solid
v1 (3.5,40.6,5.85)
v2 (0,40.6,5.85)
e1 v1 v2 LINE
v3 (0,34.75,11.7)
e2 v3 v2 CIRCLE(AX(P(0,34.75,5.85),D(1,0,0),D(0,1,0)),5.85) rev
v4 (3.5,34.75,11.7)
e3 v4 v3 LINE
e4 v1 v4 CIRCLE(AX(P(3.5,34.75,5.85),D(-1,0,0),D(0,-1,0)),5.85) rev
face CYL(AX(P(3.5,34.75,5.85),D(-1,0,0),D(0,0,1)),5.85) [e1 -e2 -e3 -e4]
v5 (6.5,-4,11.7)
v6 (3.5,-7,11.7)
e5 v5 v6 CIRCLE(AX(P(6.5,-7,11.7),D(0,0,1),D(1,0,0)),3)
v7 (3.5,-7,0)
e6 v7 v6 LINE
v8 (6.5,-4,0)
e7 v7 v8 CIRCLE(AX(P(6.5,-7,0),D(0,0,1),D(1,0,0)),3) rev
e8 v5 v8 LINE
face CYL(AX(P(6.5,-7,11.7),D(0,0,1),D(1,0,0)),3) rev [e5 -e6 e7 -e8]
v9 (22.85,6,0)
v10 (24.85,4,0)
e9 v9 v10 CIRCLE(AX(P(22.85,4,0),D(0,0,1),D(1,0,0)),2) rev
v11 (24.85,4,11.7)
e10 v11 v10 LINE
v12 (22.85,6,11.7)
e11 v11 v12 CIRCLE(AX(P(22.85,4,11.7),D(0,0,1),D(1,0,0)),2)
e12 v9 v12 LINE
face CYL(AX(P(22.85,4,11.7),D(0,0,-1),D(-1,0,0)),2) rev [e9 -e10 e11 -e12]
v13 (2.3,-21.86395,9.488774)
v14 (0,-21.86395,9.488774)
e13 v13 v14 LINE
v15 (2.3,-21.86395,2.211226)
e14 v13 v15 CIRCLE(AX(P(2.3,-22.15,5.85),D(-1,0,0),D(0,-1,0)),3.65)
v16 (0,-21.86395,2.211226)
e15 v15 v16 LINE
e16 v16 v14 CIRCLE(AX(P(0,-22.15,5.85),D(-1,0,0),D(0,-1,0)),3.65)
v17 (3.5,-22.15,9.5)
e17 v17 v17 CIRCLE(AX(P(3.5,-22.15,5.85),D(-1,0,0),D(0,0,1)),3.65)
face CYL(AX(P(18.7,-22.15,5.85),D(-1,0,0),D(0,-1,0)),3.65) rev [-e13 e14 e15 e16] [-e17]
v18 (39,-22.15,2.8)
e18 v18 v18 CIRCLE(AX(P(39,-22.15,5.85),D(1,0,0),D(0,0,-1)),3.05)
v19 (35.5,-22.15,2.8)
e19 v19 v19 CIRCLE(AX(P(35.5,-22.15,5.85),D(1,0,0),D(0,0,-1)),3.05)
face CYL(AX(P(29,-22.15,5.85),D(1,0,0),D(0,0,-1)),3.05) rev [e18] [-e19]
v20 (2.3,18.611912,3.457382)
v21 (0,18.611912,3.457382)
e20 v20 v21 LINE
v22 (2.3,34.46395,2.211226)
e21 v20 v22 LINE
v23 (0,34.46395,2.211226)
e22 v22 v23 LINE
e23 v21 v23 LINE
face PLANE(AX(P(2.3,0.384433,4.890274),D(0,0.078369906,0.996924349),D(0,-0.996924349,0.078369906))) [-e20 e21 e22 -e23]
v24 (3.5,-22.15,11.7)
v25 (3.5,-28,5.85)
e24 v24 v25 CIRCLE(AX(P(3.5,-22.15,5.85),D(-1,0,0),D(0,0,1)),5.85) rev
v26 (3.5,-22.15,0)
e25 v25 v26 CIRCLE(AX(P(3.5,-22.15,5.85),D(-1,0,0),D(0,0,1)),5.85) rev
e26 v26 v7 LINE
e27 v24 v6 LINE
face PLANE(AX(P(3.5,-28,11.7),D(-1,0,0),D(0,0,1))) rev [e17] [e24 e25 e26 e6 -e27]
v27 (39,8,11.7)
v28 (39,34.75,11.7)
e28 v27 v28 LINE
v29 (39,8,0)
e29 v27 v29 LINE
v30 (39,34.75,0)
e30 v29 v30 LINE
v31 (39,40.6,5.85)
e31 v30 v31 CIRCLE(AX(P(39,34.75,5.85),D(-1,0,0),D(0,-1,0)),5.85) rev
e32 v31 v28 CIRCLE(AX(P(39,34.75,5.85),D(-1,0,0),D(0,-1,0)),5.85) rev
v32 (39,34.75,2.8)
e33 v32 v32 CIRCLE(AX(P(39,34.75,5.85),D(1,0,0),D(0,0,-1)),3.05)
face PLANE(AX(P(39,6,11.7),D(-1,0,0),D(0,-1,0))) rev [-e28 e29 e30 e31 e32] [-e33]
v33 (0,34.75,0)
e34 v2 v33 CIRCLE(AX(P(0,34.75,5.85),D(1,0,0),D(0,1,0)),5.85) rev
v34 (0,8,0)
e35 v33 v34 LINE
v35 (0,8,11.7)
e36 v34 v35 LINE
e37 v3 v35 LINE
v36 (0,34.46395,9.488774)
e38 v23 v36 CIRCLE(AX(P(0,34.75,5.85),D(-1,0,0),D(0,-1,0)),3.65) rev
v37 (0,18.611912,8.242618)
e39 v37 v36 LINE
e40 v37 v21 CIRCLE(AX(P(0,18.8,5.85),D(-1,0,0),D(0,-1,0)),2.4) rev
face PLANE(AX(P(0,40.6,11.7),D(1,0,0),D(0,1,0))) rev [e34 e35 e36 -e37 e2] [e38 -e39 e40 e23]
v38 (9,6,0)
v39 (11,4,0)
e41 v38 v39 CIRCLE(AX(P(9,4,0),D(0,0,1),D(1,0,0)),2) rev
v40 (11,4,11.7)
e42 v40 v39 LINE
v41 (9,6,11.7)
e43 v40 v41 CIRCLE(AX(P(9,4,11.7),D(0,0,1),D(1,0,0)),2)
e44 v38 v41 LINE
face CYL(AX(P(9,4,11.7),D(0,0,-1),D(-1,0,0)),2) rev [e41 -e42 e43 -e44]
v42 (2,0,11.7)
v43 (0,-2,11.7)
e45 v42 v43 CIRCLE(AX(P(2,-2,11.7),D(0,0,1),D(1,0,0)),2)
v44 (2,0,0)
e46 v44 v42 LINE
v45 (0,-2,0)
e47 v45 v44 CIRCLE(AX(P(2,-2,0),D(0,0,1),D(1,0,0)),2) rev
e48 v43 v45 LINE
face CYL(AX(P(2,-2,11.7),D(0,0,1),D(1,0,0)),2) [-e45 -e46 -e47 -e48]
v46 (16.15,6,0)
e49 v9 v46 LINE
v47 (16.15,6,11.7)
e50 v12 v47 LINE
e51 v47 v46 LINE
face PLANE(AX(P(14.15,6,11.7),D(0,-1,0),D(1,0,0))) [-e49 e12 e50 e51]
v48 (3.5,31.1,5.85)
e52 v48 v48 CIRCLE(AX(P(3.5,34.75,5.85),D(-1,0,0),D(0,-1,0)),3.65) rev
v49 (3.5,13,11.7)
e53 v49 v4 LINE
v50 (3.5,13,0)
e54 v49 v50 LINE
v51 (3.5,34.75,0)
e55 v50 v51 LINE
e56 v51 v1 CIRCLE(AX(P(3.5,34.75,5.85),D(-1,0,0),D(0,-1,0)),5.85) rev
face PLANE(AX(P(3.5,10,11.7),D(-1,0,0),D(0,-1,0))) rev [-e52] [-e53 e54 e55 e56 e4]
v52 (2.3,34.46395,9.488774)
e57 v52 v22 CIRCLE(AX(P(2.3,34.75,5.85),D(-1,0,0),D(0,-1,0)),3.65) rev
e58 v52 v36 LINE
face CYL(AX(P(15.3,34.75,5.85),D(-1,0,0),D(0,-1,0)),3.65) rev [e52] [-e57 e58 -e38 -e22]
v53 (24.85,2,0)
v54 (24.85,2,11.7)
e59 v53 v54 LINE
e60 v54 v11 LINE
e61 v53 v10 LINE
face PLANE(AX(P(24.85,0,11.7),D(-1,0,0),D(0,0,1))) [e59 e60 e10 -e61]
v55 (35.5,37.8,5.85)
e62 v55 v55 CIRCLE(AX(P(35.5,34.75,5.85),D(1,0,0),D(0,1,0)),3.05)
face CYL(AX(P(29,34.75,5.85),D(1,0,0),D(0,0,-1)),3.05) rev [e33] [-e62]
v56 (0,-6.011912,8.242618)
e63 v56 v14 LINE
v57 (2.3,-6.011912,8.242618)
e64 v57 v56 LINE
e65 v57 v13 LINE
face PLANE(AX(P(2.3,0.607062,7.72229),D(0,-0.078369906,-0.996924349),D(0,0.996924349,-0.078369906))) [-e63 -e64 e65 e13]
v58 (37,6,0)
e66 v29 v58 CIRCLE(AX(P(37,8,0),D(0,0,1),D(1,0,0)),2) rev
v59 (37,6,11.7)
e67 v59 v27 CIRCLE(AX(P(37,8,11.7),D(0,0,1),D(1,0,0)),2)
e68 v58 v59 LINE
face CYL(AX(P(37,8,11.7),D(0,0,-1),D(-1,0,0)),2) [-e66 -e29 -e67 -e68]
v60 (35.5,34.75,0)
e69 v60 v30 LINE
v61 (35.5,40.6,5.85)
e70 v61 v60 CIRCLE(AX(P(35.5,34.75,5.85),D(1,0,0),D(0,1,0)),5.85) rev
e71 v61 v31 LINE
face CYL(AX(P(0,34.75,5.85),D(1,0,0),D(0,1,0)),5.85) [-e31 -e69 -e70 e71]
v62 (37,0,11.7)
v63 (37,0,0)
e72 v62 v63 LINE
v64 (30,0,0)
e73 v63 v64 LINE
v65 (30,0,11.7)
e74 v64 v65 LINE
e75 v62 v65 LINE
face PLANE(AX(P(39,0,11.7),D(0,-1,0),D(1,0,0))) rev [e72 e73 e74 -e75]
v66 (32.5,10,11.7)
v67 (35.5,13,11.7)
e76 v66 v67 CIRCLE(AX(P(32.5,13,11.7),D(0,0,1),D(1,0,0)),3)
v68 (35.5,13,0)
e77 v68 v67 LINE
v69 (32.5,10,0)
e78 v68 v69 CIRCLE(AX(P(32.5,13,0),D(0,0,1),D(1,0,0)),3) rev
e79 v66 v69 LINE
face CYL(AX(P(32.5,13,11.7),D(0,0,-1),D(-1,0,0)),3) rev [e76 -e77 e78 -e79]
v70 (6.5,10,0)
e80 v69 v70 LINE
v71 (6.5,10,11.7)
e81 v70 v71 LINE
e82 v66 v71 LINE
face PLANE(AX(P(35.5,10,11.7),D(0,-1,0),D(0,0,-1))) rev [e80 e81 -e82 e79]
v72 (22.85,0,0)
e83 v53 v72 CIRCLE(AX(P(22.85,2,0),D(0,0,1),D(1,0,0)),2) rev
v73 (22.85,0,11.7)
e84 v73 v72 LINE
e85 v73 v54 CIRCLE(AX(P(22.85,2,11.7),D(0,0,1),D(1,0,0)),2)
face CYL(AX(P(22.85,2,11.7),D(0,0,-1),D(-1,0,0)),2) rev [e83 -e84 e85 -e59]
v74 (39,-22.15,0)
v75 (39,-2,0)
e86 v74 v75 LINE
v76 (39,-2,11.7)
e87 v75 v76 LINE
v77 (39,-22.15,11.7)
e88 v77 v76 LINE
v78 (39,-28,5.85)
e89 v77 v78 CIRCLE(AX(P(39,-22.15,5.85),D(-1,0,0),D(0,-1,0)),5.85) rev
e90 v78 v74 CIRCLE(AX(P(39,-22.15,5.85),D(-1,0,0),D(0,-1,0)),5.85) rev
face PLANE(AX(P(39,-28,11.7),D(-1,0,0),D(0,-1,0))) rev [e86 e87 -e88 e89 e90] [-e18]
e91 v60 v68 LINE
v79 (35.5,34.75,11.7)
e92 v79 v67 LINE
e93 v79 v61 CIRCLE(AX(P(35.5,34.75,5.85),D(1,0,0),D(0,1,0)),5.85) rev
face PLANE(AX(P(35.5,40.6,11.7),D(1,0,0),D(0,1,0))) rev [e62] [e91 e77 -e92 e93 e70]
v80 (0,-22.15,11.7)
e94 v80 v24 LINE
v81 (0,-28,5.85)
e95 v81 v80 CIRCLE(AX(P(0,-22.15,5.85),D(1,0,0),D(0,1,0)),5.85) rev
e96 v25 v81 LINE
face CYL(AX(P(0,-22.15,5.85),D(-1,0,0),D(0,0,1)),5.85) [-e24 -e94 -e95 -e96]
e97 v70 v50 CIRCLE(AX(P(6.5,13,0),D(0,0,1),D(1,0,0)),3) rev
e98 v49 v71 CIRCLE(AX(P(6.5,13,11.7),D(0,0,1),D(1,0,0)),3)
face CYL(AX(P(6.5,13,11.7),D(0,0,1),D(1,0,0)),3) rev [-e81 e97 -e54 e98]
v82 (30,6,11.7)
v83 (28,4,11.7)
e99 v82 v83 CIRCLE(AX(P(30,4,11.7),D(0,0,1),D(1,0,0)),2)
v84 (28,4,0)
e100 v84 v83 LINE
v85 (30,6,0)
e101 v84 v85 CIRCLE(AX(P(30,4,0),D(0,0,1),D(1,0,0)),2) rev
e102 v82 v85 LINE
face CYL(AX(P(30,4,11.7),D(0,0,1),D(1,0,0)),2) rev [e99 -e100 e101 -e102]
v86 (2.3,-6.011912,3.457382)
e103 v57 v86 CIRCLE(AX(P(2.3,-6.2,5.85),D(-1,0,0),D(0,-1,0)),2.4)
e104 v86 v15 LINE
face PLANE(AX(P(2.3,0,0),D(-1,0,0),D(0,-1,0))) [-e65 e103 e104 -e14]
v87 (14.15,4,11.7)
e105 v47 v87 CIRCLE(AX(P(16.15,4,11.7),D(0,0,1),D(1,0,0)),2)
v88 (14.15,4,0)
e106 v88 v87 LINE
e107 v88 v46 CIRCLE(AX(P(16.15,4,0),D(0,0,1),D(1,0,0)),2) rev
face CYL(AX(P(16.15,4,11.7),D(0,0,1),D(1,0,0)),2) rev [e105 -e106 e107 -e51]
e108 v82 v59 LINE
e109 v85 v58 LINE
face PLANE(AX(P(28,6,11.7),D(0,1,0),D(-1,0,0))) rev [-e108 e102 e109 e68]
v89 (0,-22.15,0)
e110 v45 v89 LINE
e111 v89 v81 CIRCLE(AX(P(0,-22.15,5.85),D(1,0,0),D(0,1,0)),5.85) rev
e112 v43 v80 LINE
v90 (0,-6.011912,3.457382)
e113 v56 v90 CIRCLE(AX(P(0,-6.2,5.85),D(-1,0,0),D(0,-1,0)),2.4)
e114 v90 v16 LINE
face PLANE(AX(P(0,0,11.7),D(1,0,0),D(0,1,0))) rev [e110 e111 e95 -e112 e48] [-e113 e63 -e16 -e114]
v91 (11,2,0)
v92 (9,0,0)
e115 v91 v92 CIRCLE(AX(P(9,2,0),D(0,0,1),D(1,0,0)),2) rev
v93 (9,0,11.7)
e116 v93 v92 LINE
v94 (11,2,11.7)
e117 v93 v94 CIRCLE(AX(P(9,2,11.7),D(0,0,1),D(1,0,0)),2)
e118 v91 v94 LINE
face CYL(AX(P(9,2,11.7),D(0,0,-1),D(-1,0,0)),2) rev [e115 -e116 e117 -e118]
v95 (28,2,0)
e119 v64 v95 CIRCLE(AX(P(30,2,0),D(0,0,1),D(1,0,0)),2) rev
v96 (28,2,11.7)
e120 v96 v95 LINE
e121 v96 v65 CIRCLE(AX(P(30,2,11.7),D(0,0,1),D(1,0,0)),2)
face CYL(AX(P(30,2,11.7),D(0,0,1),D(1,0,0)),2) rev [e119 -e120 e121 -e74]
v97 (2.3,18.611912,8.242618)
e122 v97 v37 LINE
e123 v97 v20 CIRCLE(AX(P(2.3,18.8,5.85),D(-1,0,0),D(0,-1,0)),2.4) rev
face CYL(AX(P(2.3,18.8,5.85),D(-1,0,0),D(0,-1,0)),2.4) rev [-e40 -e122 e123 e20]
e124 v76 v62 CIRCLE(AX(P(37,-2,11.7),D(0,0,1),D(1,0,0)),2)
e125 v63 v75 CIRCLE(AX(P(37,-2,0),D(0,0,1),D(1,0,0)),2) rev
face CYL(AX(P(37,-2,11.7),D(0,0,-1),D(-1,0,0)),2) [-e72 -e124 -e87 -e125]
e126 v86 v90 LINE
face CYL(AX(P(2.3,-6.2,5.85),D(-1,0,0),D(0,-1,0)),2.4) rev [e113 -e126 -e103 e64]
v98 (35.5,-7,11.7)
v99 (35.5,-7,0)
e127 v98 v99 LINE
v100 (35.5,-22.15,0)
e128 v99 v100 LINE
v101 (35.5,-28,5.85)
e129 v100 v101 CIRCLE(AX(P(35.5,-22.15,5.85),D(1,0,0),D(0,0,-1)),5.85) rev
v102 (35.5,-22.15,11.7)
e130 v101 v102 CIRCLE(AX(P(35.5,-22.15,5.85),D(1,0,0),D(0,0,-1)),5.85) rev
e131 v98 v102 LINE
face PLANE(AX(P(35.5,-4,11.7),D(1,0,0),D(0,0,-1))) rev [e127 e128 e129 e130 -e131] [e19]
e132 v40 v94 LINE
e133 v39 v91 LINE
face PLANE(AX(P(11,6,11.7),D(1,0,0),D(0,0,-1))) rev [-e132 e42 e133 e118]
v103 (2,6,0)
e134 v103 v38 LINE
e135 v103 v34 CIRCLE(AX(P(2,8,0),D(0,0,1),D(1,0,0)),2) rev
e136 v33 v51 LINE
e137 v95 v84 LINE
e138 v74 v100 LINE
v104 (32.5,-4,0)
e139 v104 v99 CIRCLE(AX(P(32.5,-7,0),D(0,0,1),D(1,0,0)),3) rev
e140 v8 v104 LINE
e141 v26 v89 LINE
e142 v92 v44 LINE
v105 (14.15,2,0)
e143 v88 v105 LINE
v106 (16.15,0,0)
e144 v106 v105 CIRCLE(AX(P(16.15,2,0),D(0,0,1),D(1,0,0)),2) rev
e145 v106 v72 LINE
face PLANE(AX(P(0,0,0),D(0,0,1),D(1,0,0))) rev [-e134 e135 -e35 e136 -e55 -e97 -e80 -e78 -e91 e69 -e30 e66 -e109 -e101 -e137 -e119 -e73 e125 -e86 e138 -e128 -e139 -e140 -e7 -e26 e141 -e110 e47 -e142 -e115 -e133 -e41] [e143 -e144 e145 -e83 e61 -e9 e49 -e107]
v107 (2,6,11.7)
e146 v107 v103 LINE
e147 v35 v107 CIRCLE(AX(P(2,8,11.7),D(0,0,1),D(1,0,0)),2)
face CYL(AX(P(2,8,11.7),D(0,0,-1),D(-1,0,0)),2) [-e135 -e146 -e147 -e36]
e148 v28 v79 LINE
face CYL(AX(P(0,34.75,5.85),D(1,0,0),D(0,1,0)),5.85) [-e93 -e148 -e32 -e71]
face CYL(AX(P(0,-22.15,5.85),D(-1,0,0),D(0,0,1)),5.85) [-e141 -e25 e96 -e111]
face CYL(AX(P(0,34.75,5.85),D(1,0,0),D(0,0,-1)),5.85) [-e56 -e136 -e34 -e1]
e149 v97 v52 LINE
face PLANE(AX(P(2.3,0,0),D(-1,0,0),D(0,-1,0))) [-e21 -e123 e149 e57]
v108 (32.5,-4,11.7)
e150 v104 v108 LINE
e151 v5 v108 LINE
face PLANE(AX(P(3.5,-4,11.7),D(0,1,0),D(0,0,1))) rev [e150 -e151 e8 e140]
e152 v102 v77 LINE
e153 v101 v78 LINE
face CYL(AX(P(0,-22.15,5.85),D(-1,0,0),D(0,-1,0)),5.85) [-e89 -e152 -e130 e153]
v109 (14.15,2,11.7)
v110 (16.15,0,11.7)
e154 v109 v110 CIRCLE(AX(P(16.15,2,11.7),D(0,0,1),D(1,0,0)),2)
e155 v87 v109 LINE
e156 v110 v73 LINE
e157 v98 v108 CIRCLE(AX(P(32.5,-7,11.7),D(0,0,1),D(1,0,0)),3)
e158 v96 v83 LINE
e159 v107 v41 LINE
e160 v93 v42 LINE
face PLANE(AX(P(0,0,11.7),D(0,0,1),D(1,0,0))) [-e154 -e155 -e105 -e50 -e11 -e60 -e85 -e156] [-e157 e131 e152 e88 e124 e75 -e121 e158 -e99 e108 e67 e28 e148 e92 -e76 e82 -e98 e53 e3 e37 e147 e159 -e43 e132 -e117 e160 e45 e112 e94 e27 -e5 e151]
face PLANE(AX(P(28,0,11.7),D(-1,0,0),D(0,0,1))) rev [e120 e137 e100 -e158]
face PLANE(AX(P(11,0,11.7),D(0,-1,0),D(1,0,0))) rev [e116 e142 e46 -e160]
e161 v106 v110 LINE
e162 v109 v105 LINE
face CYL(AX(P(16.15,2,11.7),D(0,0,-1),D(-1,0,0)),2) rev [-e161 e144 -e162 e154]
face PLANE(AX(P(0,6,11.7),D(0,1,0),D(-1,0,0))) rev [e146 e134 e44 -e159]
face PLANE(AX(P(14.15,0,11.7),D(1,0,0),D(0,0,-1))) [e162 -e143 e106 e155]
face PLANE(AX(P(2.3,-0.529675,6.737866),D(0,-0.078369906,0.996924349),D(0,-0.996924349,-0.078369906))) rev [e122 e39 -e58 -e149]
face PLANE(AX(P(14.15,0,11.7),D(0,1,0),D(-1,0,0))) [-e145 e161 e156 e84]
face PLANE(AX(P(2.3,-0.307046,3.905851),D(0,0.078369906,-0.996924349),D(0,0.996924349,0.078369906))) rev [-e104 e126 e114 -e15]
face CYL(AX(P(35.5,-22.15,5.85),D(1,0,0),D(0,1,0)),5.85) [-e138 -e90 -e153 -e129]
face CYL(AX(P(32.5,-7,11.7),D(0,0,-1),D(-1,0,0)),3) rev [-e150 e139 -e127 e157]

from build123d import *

# Parameters (mm, degrees)
SKETCH_1_W          = 10.7
SKETCH_1_H          = 6
EXTRUDE_1_DEPTH     = 11.7
SKETCH_2_R          = 3.65
CUT_EXTRUDE_1_DEPTH = 18.7
CUT_EXTRUDE_2_DEPTH = 2.3
SKETCH_2_4_R        = 3.65
CUT_EXTRUDE_3_DEPTH = 15.3
CUT_EXTRUDE_4_DEPTH = 2.3
FILLET_1_R          = 2
FILLET_2_R          = 2
FILLET_3_R          = 2
FILLET_4_R          = 2
FILLET_5_R          = 5.85
FILLET_6_R          = 5.85
FILLET_7_R          = 5.85
FILLET_8_R          = 5.85
FILLET_9_R          = 5.85
FILLET_10_R         = 5.85
FILLET_11_R         = 5.85
FILLET_12_R         = 5.85
FILLET_13_R         = 2
FILLET_14_R         = 2
FILLET_15_R         = 2
FILLET_16_R         = 2
FILLET_17_R         = 2
FILLET_18_R         = 2
FILLET_19_R         = 2
FILLET_20_R         = 2
SKETCH_3_R          = 3.05
CUT_EXTRUDE_5_DEPTH = 10
FILLET_21_R         = 3
FILLET_22_R         = 3
FILLET_23_R         = 3
FILLET_24_R         = 3


with BuildPart() as part:
    # 草图1 → 凸台-拉伸1 (new body)
    with BuildSketch(Plane.XY):
        Polygon((0, 0), (0, -28), (3.5, -28), (3.5, -4), (35.5, -4), (35.5, -28), (39, -28), (39, 0), (28, 0), (28, 6), (39, 6), (39, 40.6), (35.5, 40.6), (35.5, 10), (3.5, 10), (3.5, 40.6), (0, 40.6), (0, 6), (11, 6), (11, 0), align=None)
        with Locations((19.5, 3)):
            Rectangle(SKETCH_1_W, SKETCH_1_H, mode=Mode.SUBTRACT)
    extrude(amount=EXTRUDE_1_DEPTH)

    # 草图2 → 切除-拉伸1 (cut)
    with BuildSketch(Plane.ZY):
        with Locations(Location((5.85, -22.15, 0), (0, 0, 270))):
            Circle(SKETCH_2_R)
    extrude(amount=-CUT_EXTRUDE_1_DEPTH, mode=Mode.SUBTRACT)

    # 草图2<3> → 切除-拉伸2 (cut)
    with BuildSketch(Plane.ZY):
        with BuildLine():
            ThreePointArc((8.242618438, -6.011912226), (5.85, -3.8), (3.457381562, -6.011912226))
            Line((3.457381562, -6.011912226), (2.211226126, -21.863949843))
            ThreePointArc((2.211226126, -21.863949843), (5.85, -18.5), (9.488773874, -21.863949843))
            Line((9.488773874, -21.863949843), (8.242618438, -6.011912226))
        make_face()
    extrude(amount=-CUT_EXTRUDE_2_DEPTH, mode=Mode.SUBTRACT)

    # 草图2<4> → 切除-拉伸3 (cut)
    with BuildSketch(Plane.ZY):
        with Locations(Location((5.85, 34.75, 0), (0, 0, 270))):
            Circle(SKETCH_2_4_R)
    extrude(amount=-CUT_EXTRUDE_3_DEPTH, mode=Mode.SUBTRACT)

    # 草图2<5> → 切除-拉伸4 (cut)
    with BuildSketch(Plane.ZY):
        with BuildLine():
            Line((2.211226126, 34.463949843), (3.457381562, 18.611912226))
            ThreePointArc((3.457381562, 18.611912226), (5.85, 16.4), (8.242618438, 18.611912226))
            Line((8.242618438, 18.611912226), (9.488773874, 34.463949843))
            ThreePointArc((9.488773874, 34.463949843), (5.85, 31.1), (2.211226126, 34.463949843))
        make_face()
    extrude(amount=-CUT_EXTRUDE_4_DEPTH, mode=Mode.SUBTRACT)

    # 圆角1
    fillet_1_edges = [part.edges().sort_by_distance(p)[0] for p in [
        (0, 6, 5.85),
    ]]
    fillet(fillet_1_edges, radius=FILLET_1_R)

    # 圆角2
    fillet_2_edges = [part.edges().sort_by_distance(p)[0] for p in [
        (39, 6, 5.85),
    ]]
    fillet(fillet_2_edges, radius=FILLET_2_R)

    # 圆角3
    fillet_3_edges = [part.edges().sort_by_distance(p)[0] for p in [
        (39, 0, 5.85),
    ]]
    fillet(fillet_3_edges, radius=FILLET_3_R)

    # 圆角4
    fillet_4_edges = [part.edges().sort_by_distance(p)[0] for p in [
        (0, 0, 5.85),
    ]]
    fillet(fillet_4_edges, radius=FILLET_4_R)

    # 圆角5
    fillet_5_edges = [part.edges().sort_by_distance(p)[0] for p in [
        (1.75, -28, 11.7),
    ]]
    fillet(fillet_5_edges, radius=FILLET_5_R)

    # 圆角6
    fillet_6_edges = [part.edges().sort_by_distance(p)[0] for p in [
        (1.75, -28, 0),
    ]]
    fillet(fillet_6_edges, radius=FILLET_6_R - 0.0001)  # a hair under: the kernel refuses the full size

    # 圆角7
    fillet_7_edges = [part.edges().sort_by_distance(p)[0] for p in [
        (37.25, -28, 0),
    ]]
    fillet(fillet_7_edges, radius=FILLET_7_R)

    # 圆角8
    fillet_8_edges = [part.edges().sort_by_distance(p)[0] for p in [
        (37.25, -28, 11.7),
    ]]
    fillet(fillet_8_edges, radius=FILLET_8_R - 0.0001)  # a hair under: the kernel refuses the full size

    # 圆角9
    fillet_9_edges = [part.edges().sort_by_distance(p)[0] for p in [
        (37.25, 40.6, 11.7),
    ]]
    fillet(fillet_9_edges, radius=FILLET_9_R)

    # 圆角10
    fillet_10_edges = [part.edges().sort_by_distance(p)[0] for p in [
        (37.25, 40.6, 0),
    ]]
    fillet(fillet_10_edges, radius=FILLET_10_R - 0.0001)  # a hair under: the kernel refuses the full size

    # 圆角11
    fillet_11_edges = [part.edges().sort_by_distance(p)[0] for p in [
        (1.75, 40.6, 0),
    ]]
    fillet(fillet_11_edges, radius=FILLET_11_R)

    # 圆角12
    fillet_12_edges = [part.edges().sort_by_distance(p)[0] for p in [
        (1.75, 40.6, 11.7),
    ]]
    fillet(fillet_12_edges, radius=FILLET_12_R - 0.0001)  # a hair under: the kernel refuses the full size

    # 圆角13
    fillet_13_edges = [part.edges().sort_by_distance(p)[0] for p in [
        (28, 6, 5.85),
    ]]
    fillet(fillet_13_edges, radius=FILLET_13_R)

    # 圆角14
    fillet_14_edges = [part.edges().sort_by_distance(p)[0] for p in [
        (28, 0, 5.85),
    ]]
    fillet(fillet_14_edges, radius=FILLET_14_R)

    # 圆角15
    fillet_15_edges = [part.edges().sort_by_distance(p)[0] for p in [
        (11, 6, 5.85),
    ]]
    fillet(fillet_15_edges, radius=FILLET_15_R)

    # 圆角16
    fillet_16_edges = [part.edges().sort_by_distance(p)[0] for p in [
        (11, 0, 5.85),
    ]]
    fillet(fillet_16_edges, radius=FILLET_16_R)

    # 圆角17
    fillet_17_edges = [part.edges().sort_by_distance(p)[0] for p in [
        (24.85, 6, 5.85),
    ]]
    fillet(fillet_17_edges, radius=FILLET_17_R)

    # 圆角18
    fillet_18_edges = [part.edges().sort_by_distance(p)[0] for p in [
        (24.85, 0, 5.85),
    ]]
    fillet(fillet_18_edges, radius=FILLET_18_R)

    # 圆角19
    fillet_19_edges = [part.edges().sort_by_distance(p)[0] for p in [
        (14.15, 6, 5.85),
    ]]
    fillet(fillet_19_edges, radius=FILLET_19_R)

    # 圆角20
    fillet_20_edges = [part.edges().sort_by_distance(p)[0] for p in [
        (14.15, 0, 5.85),
    ]]
    fillet(fillet_20_edges, radius=FILLET_20_R)

    # 草图3 → 切除-拉伸5 (cut)
    with BuildSketch(Plane(origin=(39, 0, 0), x_dir=(0, 0, -1), z_dir=(1, 0, 0))):
        with Locations((-5.85, 34.75)):
            Circle(SKETCH_3_R)
        with Locations((-5.85, -22.15)):
            Circle(SKETCH_3_R)
    extrude(amount=-CUT_EXTRUDE_5_DEPTH, mode=Mode.SUBTRACT)

    # 圆角21
    fillet_21_edges = [part.edges().sort_by_distance(p)[0] for p in [
        (3.5, -4, 5.85),
    ]]
    fillet(fillet_21_edges, radius=FILLET_21_R)

    # 圆角22
    fillet_22_edges = [part.edges().sort_by_distance(p)[0] for p in [
        (35.5, -4, 5.85),
    ]]
    fillet(fillet_22_edges, radius=FILLET_22_R)

    # 圆角23
    fillet_23_edges = [part.edges().sort_by_distance(p)[0] for p in [
        (35.5, 10, 5.85),
    ]]
    fillet(fillet_23_edges, radius=FILLET_23_R)

    # 圆角24
    fillet_24_edges = [part.edges().sort_by_distance(p)[0] for p in [
        (3.5, 10, 5.85),
    ]]
    fillet(fillet_24_edges, radius=FILLET_24_R)


solid = part.part
